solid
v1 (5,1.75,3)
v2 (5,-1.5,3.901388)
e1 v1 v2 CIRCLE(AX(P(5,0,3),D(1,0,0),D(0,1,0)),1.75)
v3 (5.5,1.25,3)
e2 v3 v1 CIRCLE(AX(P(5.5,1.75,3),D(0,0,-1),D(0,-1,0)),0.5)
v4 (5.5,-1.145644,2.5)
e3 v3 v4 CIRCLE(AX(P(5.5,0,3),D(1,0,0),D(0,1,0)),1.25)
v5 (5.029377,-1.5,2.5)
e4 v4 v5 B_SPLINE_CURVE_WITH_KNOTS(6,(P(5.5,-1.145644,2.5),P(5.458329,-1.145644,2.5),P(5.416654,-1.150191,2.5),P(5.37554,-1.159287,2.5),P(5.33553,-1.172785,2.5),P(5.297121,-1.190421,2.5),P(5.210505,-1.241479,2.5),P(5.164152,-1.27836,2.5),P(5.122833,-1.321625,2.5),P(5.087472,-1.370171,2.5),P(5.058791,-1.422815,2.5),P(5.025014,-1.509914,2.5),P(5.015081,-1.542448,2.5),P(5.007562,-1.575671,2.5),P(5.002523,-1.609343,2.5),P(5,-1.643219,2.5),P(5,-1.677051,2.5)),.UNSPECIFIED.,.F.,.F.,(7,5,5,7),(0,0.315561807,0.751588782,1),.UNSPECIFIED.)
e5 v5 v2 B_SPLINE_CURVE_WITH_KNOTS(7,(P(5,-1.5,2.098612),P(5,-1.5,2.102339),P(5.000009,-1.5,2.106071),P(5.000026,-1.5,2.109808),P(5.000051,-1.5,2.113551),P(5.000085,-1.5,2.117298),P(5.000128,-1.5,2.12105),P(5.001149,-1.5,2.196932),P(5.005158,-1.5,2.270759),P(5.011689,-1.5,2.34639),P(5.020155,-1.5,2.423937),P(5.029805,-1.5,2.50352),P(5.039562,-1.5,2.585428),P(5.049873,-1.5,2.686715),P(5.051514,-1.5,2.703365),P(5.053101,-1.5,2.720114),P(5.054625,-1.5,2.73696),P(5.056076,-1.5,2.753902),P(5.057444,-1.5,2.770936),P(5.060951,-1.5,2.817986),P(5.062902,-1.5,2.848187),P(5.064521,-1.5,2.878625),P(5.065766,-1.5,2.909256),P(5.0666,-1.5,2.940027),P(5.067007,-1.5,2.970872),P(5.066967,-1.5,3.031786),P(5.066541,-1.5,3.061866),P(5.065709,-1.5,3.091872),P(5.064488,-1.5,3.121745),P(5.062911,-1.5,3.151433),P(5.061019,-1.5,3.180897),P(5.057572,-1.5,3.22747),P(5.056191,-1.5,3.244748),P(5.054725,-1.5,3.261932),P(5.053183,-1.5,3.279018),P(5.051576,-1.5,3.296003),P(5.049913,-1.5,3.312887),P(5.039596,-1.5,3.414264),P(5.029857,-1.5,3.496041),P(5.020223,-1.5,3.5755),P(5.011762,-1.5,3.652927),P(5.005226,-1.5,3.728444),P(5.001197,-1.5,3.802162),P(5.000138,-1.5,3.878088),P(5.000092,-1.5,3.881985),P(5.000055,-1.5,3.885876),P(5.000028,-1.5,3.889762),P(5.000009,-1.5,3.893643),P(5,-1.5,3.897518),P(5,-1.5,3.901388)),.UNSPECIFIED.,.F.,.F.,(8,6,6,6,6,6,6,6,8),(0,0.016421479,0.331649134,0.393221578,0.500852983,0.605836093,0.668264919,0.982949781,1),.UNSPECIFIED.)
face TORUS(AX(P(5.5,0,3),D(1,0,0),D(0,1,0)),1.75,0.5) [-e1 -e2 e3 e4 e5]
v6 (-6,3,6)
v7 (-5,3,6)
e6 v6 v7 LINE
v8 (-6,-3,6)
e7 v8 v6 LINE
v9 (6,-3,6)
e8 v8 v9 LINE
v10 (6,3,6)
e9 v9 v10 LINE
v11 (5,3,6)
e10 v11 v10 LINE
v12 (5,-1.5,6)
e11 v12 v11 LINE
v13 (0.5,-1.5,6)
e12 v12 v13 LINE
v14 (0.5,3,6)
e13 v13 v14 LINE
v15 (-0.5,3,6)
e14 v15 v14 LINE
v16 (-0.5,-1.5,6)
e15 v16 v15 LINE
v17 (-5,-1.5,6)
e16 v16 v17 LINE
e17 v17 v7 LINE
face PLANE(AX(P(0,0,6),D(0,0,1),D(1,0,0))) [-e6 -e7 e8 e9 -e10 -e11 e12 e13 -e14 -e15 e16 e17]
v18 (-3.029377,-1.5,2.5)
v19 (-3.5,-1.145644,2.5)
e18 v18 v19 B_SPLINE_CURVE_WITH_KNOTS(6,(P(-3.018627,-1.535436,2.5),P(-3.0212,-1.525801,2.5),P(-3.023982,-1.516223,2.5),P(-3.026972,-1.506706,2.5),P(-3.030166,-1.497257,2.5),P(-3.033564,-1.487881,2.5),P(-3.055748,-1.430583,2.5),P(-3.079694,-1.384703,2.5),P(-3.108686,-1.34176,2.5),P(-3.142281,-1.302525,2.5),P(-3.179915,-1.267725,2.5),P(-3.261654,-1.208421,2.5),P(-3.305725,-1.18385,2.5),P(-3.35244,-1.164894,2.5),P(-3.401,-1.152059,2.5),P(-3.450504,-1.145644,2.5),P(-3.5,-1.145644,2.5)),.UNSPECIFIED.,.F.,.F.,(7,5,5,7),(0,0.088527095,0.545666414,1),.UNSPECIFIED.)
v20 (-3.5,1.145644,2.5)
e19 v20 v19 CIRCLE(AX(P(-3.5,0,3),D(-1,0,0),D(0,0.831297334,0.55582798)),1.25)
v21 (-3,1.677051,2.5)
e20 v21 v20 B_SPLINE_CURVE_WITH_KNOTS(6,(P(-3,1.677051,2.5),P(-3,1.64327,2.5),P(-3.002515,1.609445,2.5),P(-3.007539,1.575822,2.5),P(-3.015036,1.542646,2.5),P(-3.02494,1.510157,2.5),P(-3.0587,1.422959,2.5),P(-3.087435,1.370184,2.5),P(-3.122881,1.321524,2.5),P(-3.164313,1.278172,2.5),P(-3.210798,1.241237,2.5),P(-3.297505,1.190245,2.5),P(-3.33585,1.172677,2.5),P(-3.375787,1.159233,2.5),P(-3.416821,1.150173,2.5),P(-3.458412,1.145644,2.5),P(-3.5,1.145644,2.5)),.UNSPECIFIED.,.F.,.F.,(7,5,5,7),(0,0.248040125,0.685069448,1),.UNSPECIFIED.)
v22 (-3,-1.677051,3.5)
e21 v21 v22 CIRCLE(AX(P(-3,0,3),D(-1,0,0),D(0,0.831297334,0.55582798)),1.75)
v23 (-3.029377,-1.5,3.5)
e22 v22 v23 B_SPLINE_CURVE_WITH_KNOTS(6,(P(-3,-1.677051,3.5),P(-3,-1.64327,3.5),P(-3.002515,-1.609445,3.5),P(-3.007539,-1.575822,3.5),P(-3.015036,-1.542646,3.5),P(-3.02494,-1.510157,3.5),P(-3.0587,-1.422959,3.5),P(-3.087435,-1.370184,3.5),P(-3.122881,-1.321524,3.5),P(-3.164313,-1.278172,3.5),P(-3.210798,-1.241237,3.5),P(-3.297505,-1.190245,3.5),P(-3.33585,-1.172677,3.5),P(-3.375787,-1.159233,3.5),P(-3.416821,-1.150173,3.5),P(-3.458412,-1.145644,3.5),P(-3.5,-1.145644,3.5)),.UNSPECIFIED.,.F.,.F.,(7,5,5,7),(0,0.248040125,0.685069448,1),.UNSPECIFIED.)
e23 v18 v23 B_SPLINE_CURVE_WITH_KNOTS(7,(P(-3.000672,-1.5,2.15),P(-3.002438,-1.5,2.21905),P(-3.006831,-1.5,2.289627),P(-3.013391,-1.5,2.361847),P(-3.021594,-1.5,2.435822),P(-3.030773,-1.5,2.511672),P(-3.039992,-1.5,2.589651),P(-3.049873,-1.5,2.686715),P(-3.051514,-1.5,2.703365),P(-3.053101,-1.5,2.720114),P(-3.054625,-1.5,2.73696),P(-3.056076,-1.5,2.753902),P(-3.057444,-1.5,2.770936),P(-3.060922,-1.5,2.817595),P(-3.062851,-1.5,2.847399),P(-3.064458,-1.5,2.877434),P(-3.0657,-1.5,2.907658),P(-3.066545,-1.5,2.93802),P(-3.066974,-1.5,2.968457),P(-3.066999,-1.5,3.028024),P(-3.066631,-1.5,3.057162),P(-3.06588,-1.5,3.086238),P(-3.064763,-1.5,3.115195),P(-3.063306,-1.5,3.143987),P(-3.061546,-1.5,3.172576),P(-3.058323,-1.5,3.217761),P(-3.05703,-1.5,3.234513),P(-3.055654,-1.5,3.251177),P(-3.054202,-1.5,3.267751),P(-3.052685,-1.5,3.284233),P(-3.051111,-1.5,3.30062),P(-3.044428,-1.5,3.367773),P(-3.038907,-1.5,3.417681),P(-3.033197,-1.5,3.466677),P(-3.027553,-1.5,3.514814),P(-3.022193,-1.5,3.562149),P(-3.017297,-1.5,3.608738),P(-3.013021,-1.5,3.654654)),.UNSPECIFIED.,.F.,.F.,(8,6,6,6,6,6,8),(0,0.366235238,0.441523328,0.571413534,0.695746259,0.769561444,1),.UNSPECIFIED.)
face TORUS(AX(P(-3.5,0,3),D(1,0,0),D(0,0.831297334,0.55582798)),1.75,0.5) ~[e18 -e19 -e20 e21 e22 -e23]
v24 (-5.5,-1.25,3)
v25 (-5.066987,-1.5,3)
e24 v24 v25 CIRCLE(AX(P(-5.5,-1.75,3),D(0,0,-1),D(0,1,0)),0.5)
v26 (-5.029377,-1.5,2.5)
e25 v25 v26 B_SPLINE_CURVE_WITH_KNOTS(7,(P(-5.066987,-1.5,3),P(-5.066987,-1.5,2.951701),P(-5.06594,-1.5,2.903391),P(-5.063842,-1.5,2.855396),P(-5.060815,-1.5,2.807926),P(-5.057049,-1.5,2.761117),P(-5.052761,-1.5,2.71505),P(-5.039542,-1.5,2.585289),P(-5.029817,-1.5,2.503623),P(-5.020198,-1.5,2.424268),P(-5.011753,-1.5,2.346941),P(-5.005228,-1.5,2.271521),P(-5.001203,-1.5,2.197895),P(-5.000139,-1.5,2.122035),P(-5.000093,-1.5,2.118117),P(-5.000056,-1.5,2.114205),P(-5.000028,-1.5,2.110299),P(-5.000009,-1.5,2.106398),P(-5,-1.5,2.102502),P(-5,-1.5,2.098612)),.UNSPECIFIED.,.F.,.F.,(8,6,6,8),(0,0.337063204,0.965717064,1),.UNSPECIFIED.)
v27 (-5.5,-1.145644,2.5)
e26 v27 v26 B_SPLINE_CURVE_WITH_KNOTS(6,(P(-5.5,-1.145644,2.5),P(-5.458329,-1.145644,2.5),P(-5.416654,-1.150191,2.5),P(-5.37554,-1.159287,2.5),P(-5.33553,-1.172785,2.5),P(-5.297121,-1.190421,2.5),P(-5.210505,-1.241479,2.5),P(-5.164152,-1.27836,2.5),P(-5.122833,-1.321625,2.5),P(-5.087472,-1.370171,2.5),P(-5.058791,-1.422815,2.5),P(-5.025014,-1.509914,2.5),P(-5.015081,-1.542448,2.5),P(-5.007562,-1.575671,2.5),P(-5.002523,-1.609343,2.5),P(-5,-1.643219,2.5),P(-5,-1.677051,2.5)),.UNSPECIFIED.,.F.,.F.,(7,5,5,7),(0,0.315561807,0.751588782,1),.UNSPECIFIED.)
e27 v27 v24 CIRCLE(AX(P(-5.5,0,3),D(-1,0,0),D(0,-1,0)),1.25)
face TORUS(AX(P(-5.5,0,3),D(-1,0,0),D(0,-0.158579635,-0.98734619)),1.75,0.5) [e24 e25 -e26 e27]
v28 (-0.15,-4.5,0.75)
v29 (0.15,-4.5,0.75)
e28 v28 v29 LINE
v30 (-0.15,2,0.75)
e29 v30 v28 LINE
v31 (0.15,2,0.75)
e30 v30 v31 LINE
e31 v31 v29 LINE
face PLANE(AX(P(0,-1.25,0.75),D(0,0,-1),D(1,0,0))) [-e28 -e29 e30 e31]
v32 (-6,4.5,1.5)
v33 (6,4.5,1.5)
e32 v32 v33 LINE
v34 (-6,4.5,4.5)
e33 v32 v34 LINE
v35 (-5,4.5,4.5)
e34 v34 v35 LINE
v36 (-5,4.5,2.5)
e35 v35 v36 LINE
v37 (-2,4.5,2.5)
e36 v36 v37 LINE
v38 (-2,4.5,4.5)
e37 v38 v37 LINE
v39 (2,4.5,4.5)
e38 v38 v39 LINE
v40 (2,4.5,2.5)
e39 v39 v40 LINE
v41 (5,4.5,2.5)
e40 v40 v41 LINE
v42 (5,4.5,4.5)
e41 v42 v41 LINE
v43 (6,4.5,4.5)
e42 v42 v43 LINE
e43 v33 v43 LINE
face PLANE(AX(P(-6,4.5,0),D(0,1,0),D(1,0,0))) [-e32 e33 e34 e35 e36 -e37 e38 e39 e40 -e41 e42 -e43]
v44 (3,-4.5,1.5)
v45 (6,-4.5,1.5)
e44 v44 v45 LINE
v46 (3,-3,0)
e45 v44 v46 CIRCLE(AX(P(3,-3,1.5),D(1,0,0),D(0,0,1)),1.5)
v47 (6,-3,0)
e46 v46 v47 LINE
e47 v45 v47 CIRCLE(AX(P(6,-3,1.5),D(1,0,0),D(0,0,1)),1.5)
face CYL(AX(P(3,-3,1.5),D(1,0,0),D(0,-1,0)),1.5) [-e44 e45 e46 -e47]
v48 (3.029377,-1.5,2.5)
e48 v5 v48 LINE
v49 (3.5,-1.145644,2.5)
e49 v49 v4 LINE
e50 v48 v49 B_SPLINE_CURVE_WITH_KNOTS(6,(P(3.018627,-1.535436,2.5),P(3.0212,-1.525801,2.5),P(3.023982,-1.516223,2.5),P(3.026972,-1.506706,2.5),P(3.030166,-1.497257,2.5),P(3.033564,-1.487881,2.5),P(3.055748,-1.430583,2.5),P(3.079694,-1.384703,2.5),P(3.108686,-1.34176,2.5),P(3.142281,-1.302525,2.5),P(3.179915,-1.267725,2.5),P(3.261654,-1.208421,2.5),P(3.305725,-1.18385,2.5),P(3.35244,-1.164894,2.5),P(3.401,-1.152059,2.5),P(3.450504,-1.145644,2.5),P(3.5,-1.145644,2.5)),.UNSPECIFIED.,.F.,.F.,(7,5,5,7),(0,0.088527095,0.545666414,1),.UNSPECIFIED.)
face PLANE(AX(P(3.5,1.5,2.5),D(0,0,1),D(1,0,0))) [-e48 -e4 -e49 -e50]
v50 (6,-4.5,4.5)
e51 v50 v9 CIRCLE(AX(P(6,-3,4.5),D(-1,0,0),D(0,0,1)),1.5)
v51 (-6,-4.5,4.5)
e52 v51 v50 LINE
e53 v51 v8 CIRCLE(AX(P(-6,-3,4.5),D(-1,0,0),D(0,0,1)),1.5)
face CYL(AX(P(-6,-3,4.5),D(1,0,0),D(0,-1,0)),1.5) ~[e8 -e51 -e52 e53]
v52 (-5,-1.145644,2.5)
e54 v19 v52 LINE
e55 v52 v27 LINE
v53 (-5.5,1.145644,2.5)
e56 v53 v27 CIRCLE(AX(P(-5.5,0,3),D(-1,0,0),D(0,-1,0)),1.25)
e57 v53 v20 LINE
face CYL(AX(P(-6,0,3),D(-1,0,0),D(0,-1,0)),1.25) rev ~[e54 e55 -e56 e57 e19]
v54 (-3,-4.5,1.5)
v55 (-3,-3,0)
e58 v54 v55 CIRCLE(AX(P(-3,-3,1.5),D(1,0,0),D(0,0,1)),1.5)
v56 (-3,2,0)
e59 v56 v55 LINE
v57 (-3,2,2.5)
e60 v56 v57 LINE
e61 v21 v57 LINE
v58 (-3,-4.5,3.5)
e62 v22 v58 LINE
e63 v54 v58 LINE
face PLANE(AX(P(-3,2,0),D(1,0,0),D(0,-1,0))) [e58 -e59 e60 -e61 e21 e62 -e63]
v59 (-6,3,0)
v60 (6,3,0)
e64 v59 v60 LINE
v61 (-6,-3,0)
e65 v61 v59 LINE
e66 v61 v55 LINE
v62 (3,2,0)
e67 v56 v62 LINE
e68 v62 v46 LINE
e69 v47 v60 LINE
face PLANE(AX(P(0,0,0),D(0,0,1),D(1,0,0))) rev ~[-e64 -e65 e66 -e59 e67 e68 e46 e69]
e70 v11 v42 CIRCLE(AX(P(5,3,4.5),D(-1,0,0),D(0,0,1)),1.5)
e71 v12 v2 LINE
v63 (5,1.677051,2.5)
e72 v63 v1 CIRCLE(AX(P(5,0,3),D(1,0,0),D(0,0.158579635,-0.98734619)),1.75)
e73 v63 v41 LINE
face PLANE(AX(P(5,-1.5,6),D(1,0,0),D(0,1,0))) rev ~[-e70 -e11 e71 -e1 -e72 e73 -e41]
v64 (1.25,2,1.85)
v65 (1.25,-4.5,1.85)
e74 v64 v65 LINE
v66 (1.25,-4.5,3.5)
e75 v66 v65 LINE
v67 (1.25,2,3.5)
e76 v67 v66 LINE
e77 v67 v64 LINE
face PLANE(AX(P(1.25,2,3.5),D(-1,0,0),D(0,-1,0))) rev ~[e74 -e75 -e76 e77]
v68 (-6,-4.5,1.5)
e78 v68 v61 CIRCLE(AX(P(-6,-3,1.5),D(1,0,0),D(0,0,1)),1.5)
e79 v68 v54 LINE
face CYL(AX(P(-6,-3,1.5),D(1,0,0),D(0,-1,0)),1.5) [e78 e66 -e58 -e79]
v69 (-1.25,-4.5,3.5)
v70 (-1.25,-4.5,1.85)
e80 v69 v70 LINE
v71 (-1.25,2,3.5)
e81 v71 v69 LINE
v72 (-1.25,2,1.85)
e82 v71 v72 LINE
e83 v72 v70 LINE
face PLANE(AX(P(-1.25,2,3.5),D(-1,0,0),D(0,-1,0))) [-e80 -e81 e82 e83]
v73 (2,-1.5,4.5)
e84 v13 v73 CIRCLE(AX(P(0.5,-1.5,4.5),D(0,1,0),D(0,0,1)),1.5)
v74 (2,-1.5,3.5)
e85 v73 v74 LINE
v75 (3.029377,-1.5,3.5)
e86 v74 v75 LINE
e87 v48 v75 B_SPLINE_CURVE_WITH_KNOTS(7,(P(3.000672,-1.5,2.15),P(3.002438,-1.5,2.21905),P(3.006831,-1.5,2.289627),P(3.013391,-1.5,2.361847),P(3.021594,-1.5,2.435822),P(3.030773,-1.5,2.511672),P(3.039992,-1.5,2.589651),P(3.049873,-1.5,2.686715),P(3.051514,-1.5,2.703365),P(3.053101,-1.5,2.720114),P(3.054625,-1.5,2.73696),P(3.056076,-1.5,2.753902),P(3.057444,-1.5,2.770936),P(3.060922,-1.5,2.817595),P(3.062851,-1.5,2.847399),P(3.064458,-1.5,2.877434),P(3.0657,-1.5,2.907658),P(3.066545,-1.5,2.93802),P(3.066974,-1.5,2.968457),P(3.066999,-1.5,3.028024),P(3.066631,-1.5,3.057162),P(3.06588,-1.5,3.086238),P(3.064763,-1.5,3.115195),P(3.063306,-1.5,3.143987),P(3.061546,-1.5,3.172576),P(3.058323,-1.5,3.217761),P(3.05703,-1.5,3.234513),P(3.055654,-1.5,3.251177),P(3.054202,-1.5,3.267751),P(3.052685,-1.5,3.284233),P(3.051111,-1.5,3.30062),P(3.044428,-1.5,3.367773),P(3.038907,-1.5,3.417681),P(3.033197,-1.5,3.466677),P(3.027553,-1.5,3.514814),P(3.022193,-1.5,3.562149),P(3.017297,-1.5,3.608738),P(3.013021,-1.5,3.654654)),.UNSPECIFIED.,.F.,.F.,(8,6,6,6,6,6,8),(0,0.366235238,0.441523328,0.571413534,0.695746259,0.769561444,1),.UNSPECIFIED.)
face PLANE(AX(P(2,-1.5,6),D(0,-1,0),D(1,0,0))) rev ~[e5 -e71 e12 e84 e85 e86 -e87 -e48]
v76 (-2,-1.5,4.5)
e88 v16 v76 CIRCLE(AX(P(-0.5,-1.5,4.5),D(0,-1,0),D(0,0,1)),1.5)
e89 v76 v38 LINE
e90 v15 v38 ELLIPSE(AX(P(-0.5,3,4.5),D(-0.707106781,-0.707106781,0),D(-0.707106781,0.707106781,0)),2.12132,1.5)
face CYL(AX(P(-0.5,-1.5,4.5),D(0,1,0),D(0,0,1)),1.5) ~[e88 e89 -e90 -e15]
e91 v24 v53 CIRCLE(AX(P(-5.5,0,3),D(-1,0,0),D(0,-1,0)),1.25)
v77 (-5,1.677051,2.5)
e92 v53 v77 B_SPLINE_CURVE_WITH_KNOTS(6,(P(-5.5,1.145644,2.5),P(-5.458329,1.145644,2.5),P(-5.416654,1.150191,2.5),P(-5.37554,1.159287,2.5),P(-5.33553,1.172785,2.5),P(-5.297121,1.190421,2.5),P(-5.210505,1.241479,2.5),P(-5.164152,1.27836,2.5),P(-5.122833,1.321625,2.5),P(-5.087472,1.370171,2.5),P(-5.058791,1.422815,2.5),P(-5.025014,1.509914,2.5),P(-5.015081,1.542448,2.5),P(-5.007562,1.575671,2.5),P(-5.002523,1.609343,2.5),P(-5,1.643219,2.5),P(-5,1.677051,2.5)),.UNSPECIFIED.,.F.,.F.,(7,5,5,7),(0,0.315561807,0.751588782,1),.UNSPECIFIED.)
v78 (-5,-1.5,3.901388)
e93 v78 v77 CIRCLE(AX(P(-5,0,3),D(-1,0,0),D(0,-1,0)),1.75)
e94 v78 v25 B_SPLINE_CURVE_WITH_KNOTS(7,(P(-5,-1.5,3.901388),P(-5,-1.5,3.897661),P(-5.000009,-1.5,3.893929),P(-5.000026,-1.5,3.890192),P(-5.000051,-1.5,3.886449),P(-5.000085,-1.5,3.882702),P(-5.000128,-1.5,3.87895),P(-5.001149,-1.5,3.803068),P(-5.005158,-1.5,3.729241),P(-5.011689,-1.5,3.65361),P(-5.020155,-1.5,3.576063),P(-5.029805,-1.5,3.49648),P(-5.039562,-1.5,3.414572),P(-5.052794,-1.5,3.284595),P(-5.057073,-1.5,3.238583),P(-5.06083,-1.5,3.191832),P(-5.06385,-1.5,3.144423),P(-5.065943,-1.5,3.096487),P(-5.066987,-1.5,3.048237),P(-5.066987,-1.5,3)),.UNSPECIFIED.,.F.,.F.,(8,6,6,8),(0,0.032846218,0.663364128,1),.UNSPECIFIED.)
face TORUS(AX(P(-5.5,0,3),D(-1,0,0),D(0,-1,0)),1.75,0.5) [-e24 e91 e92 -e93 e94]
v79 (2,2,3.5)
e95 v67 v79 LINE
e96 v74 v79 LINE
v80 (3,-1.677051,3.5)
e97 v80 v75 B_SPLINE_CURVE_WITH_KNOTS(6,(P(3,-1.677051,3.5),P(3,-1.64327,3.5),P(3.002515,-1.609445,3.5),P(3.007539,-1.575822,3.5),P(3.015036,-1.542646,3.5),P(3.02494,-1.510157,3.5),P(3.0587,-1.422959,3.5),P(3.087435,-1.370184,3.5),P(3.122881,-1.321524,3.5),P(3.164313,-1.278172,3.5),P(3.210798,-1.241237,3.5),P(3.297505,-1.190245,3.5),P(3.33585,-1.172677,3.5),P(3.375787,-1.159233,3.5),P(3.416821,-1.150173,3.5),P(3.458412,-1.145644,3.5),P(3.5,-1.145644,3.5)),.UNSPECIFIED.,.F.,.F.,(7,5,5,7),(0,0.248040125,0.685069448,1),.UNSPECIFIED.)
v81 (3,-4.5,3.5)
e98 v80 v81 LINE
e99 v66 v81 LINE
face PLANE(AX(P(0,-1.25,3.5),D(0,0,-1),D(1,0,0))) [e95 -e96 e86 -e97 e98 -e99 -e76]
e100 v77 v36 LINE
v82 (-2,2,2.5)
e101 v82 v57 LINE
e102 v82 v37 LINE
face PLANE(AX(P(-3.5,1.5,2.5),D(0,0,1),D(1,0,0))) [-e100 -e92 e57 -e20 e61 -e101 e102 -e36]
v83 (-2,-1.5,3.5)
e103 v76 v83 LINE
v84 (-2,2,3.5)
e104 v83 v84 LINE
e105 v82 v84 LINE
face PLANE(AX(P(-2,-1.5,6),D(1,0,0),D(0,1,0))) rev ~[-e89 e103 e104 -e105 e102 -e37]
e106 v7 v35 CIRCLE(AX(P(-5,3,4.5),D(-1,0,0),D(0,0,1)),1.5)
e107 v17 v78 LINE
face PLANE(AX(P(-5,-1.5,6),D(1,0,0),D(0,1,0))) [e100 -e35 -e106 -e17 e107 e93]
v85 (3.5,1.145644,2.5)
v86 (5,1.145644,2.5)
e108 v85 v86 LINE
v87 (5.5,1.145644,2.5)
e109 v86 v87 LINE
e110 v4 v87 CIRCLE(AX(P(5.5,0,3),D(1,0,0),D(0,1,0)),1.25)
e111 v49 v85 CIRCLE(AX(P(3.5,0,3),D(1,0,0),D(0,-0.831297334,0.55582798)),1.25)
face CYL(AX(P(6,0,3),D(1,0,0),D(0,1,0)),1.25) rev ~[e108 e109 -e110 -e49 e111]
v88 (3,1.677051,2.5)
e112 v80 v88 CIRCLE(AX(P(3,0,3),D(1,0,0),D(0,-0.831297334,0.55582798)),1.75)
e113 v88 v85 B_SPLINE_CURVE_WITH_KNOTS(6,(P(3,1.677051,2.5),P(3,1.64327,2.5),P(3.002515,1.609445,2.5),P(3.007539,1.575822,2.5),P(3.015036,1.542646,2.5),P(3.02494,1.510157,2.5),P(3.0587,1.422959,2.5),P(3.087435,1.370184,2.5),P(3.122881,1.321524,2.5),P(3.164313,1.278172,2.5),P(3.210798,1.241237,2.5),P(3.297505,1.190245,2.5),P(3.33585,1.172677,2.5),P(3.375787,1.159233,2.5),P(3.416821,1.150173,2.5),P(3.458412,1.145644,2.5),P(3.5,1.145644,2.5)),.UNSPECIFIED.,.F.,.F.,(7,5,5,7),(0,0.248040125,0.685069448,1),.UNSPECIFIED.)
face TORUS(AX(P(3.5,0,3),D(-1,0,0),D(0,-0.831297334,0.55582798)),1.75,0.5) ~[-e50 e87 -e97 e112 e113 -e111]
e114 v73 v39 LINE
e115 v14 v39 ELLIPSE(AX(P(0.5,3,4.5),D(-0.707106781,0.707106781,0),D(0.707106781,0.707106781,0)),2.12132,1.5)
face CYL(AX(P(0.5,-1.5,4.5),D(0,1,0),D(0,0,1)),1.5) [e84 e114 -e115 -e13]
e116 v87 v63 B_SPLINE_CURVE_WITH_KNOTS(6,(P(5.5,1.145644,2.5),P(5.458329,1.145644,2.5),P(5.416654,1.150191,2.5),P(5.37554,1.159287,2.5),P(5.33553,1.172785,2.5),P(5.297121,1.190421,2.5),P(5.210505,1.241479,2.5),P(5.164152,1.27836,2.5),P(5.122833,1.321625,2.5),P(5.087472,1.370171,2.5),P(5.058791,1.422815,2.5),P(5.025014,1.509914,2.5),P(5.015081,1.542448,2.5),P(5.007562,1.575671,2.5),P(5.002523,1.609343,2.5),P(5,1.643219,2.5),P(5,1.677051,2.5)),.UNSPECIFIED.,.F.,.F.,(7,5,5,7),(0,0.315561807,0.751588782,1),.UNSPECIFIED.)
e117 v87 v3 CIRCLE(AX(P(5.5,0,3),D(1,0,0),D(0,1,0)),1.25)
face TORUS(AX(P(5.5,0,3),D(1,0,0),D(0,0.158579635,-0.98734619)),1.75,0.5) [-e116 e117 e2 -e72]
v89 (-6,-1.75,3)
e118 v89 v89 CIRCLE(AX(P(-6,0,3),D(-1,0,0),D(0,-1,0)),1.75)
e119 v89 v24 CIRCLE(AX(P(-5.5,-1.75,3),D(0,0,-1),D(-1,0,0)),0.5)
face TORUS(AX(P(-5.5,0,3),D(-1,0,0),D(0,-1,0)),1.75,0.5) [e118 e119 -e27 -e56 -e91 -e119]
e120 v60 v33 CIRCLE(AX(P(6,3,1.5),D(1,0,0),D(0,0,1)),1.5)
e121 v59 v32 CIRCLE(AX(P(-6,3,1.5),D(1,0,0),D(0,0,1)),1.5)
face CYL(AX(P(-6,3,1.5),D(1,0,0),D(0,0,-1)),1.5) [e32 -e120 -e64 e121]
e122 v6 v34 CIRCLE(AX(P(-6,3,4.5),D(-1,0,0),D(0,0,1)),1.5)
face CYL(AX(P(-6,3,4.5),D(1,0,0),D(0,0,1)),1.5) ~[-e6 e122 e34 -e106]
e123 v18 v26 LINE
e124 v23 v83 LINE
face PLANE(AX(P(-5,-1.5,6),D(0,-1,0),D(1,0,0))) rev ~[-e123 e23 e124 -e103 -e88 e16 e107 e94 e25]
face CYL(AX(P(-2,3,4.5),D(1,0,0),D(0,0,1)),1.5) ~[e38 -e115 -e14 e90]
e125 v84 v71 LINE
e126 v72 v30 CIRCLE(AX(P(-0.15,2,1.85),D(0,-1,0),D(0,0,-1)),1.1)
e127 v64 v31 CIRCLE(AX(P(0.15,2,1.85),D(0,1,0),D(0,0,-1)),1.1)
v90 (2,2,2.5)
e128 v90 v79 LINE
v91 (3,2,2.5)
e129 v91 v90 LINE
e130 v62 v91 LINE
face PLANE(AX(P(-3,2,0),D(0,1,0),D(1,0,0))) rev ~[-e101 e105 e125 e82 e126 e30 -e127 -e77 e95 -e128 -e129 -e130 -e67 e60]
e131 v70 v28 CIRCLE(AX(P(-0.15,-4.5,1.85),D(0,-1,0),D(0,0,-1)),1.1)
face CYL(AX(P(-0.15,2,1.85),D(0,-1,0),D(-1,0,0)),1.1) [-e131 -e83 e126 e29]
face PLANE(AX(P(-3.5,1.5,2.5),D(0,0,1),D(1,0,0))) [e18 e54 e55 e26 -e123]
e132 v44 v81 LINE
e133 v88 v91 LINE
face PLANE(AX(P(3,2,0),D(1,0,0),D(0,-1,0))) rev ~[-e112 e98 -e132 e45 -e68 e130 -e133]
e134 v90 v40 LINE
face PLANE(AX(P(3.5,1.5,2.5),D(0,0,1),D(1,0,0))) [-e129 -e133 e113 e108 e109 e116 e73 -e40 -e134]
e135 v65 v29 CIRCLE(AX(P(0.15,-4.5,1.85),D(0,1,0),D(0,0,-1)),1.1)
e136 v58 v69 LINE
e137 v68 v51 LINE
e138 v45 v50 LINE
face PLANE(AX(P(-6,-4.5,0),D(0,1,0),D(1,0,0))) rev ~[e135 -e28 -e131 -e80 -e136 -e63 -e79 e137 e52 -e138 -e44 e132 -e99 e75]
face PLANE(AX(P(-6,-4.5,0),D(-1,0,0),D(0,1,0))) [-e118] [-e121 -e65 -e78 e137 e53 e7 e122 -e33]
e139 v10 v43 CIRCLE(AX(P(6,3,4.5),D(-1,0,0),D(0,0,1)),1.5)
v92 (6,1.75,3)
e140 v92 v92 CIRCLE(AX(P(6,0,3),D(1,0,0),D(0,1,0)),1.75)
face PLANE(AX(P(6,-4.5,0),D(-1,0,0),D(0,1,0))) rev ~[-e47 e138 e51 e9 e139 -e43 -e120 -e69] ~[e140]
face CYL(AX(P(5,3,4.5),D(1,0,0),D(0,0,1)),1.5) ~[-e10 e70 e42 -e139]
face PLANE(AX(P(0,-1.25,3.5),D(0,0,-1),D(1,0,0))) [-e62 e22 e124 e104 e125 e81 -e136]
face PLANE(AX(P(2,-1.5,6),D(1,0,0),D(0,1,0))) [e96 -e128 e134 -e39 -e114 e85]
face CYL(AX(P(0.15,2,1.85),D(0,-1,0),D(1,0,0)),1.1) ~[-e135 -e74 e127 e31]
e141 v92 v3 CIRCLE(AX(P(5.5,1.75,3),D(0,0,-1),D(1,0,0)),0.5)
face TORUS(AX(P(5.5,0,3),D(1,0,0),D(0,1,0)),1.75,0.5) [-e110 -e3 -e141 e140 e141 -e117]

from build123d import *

# Parameters (mm, degrees)
F0_W          = 12
F0_H          = 9
F1_DEPTH      = 6
F2_W          = 3
F2_H          = 6
F3_DEPTH      = 3.5
F4_W          = 6
F4_H          = 6.5
F5_DEPTH      = 3.5
F6_R          = 1.25
F7_DEPTH      = 3
F8_R          = 1.25
F9_DEPTH      = 3.001
F10_R         = 1.5
F11_W         = 2.5
F11_H         = 6.5
F12_DEPTH     = 2.75
F13_R         = 1.1
F14_T8_ANGLE  = 247.5355258221
F14_T13_ANGLE = 80.8755372564
F14_T18_ANGLE = 260.9918579461
F14_T24_ANGLE = 247.5355258221
F14_T29_ANGLE = 260.9918579461
F14_T35_ANGLE = 80.8755372564


# Not quite as in the source:
# - a fillet or chamfer that OpenCascade refuses, or shapes differently, is made with other operations: its cross-section is extruded or revolved along the edge and cut away or added


with BuildPart() as f1:
    # F0 (on Top) → F1 (new body)
    with BuildSketch(Plane.XY):
        Rectangle(F0_W, F0_H)
    extrude(amount=F1_DEPTH)

    # F2 (on face) → F3 (cut)
    with BuildSketch(Plane.XY.offset(6)):
        with Locations((3.5, 1.5)):
            Rectangle(F2_W, F2_H)
        with Locations((-3.5, 1.5)):
            Rectangle(F2_W, F2_H)
    extrude(amount=-F3_DEPTH, mode=Mode.SUBTRACT)

    # F4 (on face) → F5 (cut)
    with BuildSketch(Plane(origin=(0, 0, 0), x_dir=(1, 0, 0), z_dir=(0, 0, -1))):
        with Locations((0, 1.25)):
            Rectangle(F4_W, F4_H)
    extrude(amount=-F5_DEPTH, mode=Mode.SUBTRACT)

    # F6 (on face) → F7 (cut)
    with BuildSketch(Plane.YZ.offset(6)):
        with Locations((0, 3)):
            Circle(F6_R)
    extrude(amount=-F7_DEPTH, mode=Mode.SUBTRACT)

    # F8 (on face) → F9 (cut, through all)
    with BuildSketch(Plane(origin=(-6, 0, 0), x_dir=(0, -1, 0), z_dir=(-1, 0, 0))):
        with Locations((0, 3)):
            Circle(F8_R)
    extrude(amount=-F9_DEPTH, mode=Mode.SUBTRACT)

    # F10
    f10_edges = [f1.edges().sort_by_distance(p)[0] for p in [
        (2, 1.5, 6),
        (-2, 1.5, 6),
        (0, -4.5, 6),
        (-4.5, -4.5, 0),
        (4.5, -4.5, 0),
        (0, 4.5, 0),
        (-5.5, 4.5, 6),
        (5.5, 4.5, 6),
        (0, 4.5, 6),
    ]]
    fillet(f10_edges, radius=F10_R)

    # F11 (on face) → F12 (join)
    with BuildSketch(Plane(origin=(0, 0, 3.5), x_dir=(1, 0, 0), z_dir=(0, 0, -1))):
        with Locations((0, 1.25)):
            Rectangle(F11_W, F11_H)
    extrude(amount=F12_DEPTH)

    # F13
    f13_edges = [f1.edges().sort_by_distance(p)[0] for p in [
        (-1.25, -1.25, 0.75),
        (1.25, -1.25, 0.75),
    ]]
    fillet(f13_edges, radius=F13_R)

    # F14: fillet of radius 0.5 on 7 edges, made by hand

    # F14_s1 → F14_t2 (revolve, cut)
    with BuildSketch(Plane.XY.offset(3)):
        with BuildLine():
            ThreePointArc((6, 1.75), (5.8535533906, 1.3964466094), (5.5, 1.25))
            Line((5.5, 1.25), (6, 1.25))
            Line((6, 1.25), (6, 1.75))
        make_face()
    revolve(axis=Axis((6, 0, 3), (1, 0, 0)), mode=Mode.SUBTRACT)

    # F14_s3 → F14_t4 (revolve, cut)
    with BuildSketch(Plane.XY.offset(3)):
        with BuildLine():
            ThreePointArc((-6, -1.75), (-5.8535533906, -1.3964466094), (-5.5, -1.25))
            Line((-5.5, -1.25), (-6, -1.25))
            Line((-6, -1.25), (-6, -1.75))
        make_face()
    revolve(axis=Axis((-6, 0, 3), (-1, 0, 0)), mode=Mode.SUBTRACT)


with BuildPart() as f14_tool6:
    # F14_s7 → F14_t8 (revolve)
    with BuildSketch(Plane(origin=(0, -1.3861749524, 2.0731657713), x_dir=(1, 0, 0), z_dir=(0, -0.5558279796, 0.8312973338))):
        with BuildLine():
            ThreePointArc((-3, 3.4174839388), (-3.1464466094, 3.0639305482), (-3.5, 2.9174839388))
            Line((-3.5, 2.9174839388), (-3, 2.9174839388))
            Line((-3, 2.9174839388), (-3, 3.4174839388))
        make_face()
    revolve(axis=Axis((-3, 0, 3), (-1, 0, 0)), revolution_arc=F14_T8_ANGLE)

    split(bisect_by=Plane.XY.offset(3.5), keep=Keep.BOTTOM)


with BuildPart() as f1_1:
    add(f1.part)

    # F14_t5: cut F14_tool6
    add(f14_tool6.part, mode=Mode.SUBTRACT)


with BuildPart() as f14_tool11:
    # F14_s12 → F14_t13 (revolve)
    with BuildSketch(Plane(origin=(0, 0.469718994, 0.0754425014), x_dir=(1, 0, 0), z_dir=(0, -0.9873461903, -0.1585796345))):
        with BuildLine():
            ThreePointArc((5.5, 1.7120385709), (5.1464466094, 1.5655919615), (5, 1.2120385709))
            Line((5, 1.2120385709), (5, 1.7120385709))
            Line((5, 1.7120385709), (5.5, 1.7120385709))
        make_face()
    revolve(axis=Axis((5, 0, 3), (1, 0, 0)), revolution_arc=F14_T13_ANGLE)

    split(bisect_by=Plane.XY.offset(2.5), keep=Keep.TOP)


with BuildPart() as f1_2:
    add(f1_1.part)

    # F14_t10: cut F14_tool11
    add(f14_tool11.part, mode=Mode.SUBTRACT)


with BuildPart() as f14_tool16:
    # F14_s17 → F14_t18 (revolve)
    with BuildSketch(Plane.XY.offset(3)):
        with BuildLine():
            ThreePointArc((5.5, 1.25), (5.1464466094, 1.3964466094), (5, 1.75))
            Line((5, 1.75), (5, 1.25))
            Line((5, 1.25), (5.5, 1.25))
        make_face()
    revolve(axis=Axis((5, 0, 3), (1, 0, 0)), revolution_arc=F14_T18_ANGLE)

    split(bisect_by=Plane.XZ.offset(1.5), keep=Keep.BOTTOM)

    split(bisect_by=Plane.XY.offset(2.5), keep=Keep.TOP)


with BuildPart() as f1_3:
    add(f1_2.part)

    # F14_t15: cut F14_tool16
    add(f14_tool16.part, mode=Mode.SUBTRACT)


with BuildPart() as f14_tool22:
    # F14_s23 → F14_t24 (revolve)
    with BuildSketch(Plane(origin=(0, 1.3861749524, 2.0731657713), x_dir=(1, 0, 0), z_dir=(0, 0.5558279796, 0.8312973338))):
        with BuildLine():
            ThreePointArc((3, -3.4174839388), (3.1464466094, -3.0639305482), (3.5, -2.9174839388))
            Line((3.5, -2.9174839388), (3, -2.9174839388))
            Line((3, -2.9174839388), (3, -3.4174839388))
        make_face()
    revolve(axis=Axis((3, 0, 3), (1, 0, 0)), revolution_arc=F14_T24_ANGLE)

    split(bisect_by=Plane.XY.offset(3.5), keep=Keep.BOTTOM)


with BuildPart() as f1_4:
    add(f1_3.part)

    # F14_t21: cut F14_tool22
    add(f14_tool22.part, mode=Mode.SUBTRACT)


with BuildPart() as f14_tool27:
    # F14_s28 → F14_t29 (revolve)
    with BuildSketch(Plane.XY.offset(3)):
        with BuildLine():
            ThreePointArc((-5.5, -1.25), (-5.1464466094, -1.3964466094), (-5, -1.75))
            Line((-5, -1.75), (-5, -1.25))
            Line((-5, -1.25), (-5.5, -1.25))
        make_face()
    revolve(axis=Axis((-5, 0, 3), (-1, 0, 0)), revolution_arc=F14_T29_ANGLE)

    split(bisect_by=Plane.XZ.offset(1.5), keep=Keep.BOTTOM)

    split(bisect_by=Plane.XY.offset(2.5), keep=Keep.TOP)


with BuildPart() as f1_5:
    add(f1_4.part)

    # F14_t26: cut F14_tool27
    add(f14_tool27.part, mode=Mode.SUBTRACT)


with BuildPart() as f14_tool33:
    # F14_s34 → F14_t35 (revolve)
    with BuildSketch(Plane(origin=(0, -0.469718994, 0.0754425014), x_dir=(1, 0, 0), z_dir=(0, 0.9873461903, -0.1585796345))):
        with BuildLine():
            ThreePointArc((-5.5, -1.7120385709), (-5.1464466094, -1.5655919615), (-5, -1.2120385709))
            Line((-5, -1.2120385709), (-5, -1.7120385709))
            Line((-5, -1.7120385709), (-5.5, -1.7120385709))
        make_face()
    revolve(axis=Axis((-5, 0, 3), (-1, 0, 0)), revolution_arc=F14_T35_ANGLE)

    split(bisect_by=Plane.XZ.offset(1.5), keep=Keep.BOTTOM)

    split(bisect_by=Plane.XY.offset(2.5), keep=Keep.TOP)


with BuildPart() as f1_6:
    add(f1_5.part)

    # F14_t32: cut F14_tool33
    add(f14_tool33.part, mode=Mode.SUBTRACT)


solid = f1_6.part
